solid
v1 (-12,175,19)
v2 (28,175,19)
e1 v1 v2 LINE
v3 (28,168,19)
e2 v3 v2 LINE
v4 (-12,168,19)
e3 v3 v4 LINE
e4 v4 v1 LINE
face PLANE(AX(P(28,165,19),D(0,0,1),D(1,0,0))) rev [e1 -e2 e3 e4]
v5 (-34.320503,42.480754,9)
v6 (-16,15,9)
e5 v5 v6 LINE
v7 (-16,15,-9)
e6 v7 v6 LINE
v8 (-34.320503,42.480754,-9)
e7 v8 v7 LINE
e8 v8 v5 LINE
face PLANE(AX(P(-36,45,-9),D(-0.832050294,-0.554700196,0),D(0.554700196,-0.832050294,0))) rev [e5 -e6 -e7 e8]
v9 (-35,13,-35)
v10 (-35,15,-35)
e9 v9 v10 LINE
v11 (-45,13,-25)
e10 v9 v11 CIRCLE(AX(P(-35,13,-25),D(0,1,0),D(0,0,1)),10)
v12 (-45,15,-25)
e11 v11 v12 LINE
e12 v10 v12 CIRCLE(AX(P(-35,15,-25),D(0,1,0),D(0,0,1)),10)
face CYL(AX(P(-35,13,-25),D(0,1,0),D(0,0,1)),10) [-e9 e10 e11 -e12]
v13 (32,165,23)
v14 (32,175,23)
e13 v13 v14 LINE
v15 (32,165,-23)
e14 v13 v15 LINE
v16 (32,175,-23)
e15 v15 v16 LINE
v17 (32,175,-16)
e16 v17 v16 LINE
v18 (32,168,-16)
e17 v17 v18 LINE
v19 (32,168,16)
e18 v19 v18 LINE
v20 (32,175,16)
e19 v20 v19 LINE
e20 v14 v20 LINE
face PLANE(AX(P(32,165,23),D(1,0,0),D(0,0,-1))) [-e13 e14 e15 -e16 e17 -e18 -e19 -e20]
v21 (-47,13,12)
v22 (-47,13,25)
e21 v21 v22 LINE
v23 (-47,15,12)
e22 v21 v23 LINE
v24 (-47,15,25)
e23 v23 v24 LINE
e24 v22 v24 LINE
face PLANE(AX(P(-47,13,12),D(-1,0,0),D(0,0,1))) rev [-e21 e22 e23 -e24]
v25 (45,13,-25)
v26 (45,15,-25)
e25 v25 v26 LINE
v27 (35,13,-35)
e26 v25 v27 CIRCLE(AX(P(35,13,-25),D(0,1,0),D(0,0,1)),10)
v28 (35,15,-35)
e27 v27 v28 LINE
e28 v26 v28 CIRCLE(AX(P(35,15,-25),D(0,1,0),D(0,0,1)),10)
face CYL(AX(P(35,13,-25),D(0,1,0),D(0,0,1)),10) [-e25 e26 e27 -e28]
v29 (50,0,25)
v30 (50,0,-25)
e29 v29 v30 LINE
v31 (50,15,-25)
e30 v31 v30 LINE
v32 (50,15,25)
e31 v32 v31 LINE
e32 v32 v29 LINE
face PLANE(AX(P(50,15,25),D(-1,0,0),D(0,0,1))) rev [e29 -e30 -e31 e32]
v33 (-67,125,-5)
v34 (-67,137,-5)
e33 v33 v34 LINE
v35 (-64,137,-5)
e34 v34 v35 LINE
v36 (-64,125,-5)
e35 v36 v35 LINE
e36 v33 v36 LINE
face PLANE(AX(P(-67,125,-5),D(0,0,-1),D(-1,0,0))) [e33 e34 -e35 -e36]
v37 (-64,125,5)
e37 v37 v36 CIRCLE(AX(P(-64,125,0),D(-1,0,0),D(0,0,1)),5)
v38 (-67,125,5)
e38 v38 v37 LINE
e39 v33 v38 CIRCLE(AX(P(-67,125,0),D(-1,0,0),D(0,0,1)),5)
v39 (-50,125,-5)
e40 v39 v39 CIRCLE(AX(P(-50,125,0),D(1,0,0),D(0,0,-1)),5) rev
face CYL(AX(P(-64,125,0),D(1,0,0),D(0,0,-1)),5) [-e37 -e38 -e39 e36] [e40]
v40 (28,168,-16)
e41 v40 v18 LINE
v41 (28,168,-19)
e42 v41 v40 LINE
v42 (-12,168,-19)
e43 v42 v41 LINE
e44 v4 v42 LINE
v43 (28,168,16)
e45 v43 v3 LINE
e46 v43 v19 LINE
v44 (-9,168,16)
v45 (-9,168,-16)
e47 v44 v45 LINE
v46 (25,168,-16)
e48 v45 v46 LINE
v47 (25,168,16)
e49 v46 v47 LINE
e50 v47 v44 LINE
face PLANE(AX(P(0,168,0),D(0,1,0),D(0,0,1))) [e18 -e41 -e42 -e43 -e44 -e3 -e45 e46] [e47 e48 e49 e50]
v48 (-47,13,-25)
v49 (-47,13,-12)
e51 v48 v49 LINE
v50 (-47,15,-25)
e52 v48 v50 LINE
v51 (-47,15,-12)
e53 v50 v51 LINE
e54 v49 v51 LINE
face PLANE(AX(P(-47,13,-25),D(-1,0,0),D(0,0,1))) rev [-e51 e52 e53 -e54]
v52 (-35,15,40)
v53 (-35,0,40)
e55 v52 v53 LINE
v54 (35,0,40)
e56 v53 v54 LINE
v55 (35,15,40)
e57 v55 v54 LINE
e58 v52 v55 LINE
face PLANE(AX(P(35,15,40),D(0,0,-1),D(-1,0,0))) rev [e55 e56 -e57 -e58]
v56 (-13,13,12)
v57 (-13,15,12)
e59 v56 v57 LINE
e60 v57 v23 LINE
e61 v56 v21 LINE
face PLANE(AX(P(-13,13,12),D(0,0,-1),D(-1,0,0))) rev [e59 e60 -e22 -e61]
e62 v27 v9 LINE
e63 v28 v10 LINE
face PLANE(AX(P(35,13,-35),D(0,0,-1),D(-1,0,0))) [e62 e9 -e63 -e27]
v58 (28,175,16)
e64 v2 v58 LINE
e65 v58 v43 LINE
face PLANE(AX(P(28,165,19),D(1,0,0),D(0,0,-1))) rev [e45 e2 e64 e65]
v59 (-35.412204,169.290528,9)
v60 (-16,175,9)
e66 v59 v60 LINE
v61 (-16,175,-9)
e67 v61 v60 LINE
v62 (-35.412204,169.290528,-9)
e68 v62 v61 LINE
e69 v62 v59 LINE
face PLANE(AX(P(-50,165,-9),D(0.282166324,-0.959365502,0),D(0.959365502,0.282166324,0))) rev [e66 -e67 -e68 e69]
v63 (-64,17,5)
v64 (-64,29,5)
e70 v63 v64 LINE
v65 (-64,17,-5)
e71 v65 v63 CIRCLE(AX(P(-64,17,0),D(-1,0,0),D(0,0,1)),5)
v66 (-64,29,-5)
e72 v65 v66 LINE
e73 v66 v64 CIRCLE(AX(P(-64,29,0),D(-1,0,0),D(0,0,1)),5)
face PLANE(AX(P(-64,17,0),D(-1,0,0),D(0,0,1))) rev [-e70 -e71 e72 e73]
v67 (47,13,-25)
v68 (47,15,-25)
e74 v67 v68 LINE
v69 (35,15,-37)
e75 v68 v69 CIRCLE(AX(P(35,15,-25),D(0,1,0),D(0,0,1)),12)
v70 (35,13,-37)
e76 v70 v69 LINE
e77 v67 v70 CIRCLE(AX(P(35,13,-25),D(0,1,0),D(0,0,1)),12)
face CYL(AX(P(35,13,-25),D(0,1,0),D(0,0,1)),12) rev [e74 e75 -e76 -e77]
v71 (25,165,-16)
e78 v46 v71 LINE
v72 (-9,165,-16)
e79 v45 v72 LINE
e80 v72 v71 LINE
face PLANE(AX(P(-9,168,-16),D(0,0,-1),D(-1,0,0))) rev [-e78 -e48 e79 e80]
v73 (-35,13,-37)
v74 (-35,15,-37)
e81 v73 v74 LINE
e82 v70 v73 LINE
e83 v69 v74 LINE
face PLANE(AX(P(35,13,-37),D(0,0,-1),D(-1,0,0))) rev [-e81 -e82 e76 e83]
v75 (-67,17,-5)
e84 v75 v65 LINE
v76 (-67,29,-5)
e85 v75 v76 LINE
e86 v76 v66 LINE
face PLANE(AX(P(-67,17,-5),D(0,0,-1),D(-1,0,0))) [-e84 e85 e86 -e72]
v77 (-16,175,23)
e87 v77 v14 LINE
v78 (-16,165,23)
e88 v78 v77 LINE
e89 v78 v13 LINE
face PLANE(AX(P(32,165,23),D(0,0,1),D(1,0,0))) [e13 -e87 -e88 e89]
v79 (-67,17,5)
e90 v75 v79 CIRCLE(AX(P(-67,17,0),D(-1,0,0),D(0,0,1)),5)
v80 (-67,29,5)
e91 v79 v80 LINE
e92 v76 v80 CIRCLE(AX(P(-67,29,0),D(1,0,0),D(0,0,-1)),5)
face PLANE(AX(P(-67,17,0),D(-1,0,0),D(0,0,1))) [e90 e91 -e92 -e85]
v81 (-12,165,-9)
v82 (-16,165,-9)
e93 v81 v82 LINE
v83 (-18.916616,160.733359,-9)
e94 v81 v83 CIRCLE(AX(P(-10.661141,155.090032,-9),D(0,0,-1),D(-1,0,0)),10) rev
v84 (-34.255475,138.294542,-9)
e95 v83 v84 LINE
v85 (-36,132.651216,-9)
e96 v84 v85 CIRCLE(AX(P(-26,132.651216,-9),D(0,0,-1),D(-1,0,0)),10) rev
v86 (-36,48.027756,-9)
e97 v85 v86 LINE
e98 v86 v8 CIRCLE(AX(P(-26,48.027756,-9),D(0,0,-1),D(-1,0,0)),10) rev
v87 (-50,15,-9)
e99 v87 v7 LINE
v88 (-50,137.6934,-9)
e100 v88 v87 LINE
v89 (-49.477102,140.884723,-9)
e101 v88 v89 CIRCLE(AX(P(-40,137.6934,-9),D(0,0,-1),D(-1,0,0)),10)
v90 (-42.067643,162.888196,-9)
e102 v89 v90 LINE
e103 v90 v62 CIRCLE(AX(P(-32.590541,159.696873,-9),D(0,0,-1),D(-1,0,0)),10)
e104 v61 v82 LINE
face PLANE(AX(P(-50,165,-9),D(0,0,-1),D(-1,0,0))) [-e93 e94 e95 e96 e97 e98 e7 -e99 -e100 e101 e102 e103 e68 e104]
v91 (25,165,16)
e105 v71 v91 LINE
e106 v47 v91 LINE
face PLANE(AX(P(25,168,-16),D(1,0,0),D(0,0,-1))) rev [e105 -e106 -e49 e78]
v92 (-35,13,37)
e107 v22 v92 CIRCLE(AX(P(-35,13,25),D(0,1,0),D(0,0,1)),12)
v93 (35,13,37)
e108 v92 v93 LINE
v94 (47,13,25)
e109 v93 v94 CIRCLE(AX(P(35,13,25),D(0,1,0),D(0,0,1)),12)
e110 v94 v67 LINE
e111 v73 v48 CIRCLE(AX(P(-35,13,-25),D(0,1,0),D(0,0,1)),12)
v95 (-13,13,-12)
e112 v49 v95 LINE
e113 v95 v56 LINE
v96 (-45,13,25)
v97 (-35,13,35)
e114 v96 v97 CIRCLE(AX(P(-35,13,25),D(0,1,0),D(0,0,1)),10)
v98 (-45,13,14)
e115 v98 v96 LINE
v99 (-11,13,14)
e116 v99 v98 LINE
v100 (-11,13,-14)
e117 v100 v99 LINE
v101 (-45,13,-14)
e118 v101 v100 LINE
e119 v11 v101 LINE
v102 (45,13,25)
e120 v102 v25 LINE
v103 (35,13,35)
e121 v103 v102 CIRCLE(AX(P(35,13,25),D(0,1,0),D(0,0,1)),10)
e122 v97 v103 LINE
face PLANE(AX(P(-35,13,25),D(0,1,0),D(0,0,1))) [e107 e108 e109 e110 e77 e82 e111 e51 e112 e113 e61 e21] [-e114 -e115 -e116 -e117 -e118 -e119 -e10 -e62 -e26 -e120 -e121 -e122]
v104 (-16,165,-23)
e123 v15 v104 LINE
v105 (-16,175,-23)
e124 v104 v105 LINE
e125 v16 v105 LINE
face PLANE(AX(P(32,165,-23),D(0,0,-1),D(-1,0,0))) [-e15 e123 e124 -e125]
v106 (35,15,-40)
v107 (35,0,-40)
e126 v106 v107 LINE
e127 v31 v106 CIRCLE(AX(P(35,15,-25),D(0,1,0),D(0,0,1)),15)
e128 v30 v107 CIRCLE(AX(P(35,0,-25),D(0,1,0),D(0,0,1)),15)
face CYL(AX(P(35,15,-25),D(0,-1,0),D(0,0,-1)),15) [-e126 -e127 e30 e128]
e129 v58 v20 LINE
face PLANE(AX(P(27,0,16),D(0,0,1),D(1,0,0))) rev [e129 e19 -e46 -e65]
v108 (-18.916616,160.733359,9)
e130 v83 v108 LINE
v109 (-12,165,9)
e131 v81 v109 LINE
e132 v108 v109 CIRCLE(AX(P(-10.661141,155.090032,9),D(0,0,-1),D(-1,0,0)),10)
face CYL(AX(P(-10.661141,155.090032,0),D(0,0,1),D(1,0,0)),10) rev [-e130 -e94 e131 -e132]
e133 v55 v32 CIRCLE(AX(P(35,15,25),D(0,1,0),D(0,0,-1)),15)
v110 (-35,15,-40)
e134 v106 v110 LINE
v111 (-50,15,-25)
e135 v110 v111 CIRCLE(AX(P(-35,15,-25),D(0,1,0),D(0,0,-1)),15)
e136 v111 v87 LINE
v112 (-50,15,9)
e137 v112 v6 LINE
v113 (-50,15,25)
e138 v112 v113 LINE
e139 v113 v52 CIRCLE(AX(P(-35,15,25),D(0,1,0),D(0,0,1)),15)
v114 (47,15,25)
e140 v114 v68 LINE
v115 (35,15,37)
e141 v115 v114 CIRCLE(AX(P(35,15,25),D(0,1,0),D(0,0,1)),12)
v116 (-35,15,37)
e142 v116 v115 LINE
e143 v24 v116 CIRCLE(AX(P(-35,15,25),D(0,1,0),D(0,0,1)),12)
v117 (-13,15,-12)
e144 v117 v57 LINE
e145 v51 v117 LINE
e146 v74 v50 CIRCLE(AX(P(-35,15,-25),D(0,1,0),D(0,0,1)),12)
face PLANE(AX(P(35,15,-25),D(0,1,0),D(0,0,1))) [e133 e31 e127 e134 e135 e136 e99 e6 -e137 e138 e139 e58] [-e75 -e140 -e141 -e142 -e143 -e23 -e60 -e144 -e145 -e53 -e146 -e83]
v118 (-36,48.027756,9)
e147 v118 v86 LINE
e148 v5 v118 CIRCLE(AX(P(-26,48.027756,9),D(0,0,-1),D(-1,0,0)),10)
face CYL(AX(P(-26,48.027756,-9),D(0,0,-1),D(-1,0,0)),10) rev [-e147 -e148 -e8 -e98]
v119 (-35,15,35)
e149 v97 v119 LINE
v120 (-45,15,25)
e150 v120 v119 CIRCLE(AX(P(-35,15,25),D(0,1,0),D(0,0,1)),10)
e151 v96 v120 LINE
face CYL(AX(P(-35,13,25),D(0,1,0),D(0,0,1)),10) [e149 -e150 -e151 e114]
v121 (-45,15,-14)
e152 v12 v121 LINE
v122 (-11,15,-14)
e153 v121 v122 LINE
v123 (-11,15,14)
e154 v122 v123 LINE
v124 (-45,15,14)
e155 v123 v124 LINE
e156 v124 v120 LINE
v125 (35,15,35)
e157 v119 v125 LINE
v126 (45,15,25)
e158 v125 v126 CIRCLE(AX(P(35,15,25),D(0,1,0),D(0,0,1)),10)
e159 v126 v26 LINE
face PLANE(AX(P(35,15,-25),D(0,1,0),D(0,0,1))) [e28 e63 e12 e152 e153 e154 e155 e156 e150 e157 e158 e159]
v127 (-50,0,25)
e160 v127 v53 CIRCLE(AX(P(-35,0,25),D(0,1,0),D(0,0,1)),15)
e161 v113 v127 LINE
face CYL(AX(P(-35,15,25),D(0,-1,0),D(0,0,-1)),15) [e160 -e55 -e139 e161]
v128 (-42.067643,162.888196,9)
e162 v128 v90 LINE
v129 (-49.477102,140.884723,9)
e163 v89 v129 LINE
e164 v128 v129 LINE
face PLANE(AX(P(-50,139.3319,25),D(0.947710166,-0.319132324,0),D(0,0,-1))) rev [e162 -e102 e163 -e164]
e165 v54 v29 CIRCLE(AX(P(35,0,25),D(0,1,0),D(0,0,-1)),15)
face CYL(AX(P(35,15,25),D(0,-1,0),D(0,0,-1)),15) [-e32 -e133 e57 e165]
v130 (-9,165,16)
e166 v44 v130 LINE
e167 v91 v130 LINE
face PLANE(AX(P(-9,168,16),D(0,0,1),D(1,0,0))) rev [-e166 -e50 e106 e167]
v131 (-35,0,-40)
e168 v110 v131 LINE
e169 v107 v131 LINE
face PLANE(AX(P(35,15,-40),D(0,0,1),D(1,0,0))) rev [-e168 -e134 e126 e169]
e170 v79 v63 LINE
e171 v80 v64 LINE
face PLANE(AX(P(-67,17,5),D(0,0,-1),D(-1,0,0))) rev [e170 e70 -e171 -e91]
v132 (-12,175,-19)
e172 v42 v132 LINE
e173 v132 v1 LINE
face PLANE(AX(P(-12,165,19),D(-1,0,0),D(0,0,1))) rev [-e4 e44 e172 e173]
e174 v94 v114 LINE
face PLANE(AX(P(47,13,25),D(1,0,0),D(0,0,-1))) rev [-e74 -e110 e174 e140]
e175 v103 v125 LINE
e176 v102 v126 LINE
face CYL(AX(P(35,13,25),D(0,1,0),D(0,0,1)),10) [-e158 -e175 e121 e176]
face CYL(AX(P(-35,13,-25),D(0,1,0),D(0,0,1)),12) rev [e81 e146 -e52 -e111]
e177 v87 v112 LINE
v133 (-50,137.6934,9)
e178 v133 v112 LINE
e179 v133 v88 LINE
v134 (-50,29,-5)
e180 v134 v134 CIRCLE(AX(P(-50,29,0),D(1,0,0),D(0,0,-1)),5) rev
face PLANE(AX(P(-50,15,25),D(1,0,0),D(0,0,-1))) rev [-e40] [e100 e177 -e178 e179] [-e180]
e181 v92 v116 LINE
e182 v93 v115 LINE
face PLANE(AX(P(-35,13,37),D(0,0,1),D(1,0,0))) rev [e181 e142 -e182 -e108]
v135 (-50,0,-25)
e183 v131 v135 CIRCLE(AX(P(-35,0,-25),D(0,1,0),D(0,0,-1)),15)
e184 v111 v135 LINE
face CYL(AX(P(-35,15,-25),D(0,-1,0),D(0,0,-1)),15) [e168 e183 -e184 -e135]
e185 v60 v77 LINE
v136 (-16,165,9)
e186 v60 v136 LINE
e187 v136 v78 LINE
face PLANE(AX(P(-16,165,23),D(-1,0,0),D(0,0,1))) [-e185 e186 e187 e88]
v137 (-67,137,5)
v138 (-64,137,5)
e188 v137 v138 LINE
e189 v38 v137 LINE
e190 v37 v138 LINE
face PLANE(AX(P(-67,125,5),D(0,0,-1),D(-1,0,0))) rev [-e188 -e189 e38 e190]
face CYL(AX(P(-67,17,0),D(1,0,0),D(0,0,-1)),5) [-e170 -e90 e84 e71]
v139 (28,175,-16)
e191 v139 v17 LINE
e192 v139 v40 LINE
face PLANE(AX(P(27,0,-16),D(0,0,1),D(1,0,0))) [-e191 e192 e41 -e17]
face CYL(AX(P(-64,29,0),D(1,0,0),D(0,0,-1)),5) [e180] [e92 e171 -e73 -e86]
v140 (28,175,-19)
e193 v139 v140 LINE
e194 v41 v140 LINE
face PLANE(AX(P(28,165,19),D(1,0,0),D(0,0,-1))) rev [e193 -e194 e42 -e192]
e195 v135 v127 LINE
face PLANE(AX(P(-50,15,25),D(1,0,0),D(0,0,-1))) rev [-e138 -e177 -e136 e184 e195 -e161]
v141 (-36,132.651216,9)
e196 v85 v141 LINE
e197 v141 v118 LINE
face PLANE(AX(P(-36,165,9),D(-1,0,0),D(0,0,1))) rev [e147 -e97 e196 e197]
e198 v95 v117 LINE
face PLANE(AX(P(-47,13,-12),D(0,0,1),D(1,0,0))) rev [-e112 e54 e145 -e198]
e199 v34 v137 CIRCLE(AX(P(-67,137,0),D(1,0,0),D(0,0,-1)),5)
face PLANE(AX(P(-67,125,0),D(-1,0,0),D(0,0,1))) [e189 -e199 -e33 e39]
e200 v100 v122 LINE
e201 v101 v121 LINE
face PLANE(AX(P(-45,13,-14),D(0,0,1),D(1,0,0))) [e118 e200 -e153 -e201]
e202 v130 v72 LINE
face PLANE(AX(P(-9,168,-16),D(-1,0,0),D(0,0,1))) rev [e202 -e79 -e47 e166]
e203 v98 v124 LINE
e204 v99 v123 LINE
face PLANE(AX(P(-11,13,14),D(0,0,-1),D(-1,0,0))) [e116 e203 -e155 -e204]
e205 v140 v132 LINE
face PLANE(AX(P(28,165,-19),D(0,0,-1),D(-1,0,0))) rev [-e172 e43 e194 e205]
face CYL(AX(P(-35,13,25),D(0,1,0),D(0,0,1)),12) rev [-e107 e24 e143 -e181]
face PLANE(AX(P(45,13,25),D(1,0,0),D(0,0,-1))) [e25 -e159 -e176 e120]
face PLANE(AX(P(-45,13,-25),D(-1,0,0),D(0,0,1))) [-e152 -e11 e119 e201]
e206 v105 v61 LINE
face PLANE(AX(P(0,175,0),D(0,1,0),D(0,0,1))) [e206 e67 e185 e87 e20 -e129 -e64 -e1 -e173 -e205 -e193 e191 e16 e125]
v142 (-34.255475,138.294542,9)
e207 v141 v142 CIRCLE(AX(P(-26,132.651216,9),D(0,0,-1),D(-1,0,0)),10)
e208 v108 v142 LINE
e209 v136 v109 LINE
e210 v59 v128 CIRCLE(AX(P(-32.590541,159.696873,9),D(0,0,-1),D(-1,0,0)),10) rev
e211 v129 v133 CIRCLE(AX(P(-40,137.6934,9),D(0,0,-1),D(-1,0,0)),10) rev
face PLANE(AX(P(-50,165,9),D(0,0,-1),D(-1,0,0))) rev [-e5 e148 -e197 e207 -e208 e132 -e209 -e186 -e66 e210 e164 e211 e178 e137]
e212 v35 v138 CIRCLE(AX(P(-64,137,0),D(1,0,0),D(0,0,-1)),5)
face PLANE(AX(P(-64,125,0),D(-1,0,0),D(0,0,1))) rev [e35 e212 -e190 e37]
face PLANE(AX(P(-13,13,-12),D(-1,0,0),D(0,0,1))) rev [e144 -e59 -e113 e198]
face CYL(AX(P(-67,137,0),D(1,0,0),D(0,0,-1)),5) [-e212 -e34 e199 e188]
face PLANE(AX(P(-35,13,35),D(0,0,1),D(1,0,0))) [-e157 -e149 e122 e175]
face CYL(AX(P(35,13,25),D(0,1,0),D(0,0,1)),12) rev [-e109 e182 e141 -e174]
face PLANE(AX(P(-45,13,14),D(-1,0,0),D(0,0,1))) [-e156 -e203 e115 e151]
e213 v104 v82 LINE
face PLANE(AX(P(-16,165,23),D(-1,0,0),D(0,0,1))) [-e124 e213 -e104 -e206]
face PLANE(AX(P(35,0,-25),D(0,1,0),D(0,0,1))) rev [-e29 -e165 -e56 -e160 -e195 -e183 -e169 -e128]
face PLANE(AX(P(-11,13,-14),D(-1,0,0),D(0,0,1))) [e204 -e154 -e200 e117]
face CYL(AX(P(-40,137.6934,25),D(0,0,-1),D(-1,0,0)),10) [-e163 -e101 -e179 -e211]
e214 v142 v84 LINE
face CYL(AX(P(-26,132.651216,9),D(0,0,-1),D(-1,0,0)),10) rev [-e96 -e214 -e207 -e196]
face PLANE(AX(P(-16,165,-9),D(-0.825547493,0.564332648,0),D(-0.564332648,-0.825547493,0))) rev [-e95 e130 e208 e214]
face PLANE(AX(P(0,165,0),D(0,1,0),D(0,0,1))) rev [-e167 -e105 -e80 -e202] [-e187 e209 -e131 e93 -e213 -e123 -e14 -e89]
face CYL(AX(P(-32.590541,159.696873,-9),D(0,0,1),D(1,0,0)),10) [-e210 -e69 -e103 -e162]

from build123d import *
from build123d.topology import SkipClean

# Parameters (mm, degrees)
BOSS_EXTRUDE1_DEPTH  = 15
SKETCH3_W            = 14
SKETCH3_H            = 18
BOSS_EXTRUDE2_DEPTH  = 150
BOSS_EXTRUDE3_DEPTH  = 18
SKETCH7_W            = 48
SKETCH7_H            = 46
SKETCH7_W_2          = 40
SKETCH7_H_2          = 38
BOSS_EXTRUDE4_DEPTH  = 10
BOSS_EXTRUDE5_DEPTH  = 18
FILLET2_R            = 10
CHAMFER2_SIZE        = 10
CHAMFER2_SIZE2       = 25.668100083
FILLET3_R            = 10
FILLET4_R            = 10
SKETCH11_W           = 40
SKETCH11_H           = 38
SKETCH11_W_2         = 34
SKETCH11_H_2         = 32
BOSS_EXTRUDE6_DEPTH  = 3
SKETCH12_W           = 32
SKETCH12_H           = 7
CUT_EXTRUDE2_DEPTH   = 5
CUT_EXTRUDE3_DEPTH   = 2
SKETCH15_R           = 5
BOSS_EXTRUDE8_DEPTH  = 14
BOSS_EXTRUDE10_DEPTH = 3


with BuildPart() as part:
    # Sketch1 → Boss-Extrude1 (new body)
    with BuildSketch(Plane(origin=(0, 0, 0), x_dir=(1, 0, 0), z_dir=(0, 1, 0))):
        with BuildLine():
            Line((35, -40), (-35, -40))
            ThreePointArc((-35, -40), (-45.606601718, -35.606601718), (-50, -25))
            Line((-50, -25), (-50, 25))
            ThreePointArc((-50, 25), (-45.606601718, 35.606601718), (-35, 40))
            Line((-35, 40), (35, 40))
            ThreePointArc((35, 40), (45.606601718, 35.606601718), (50, 25))
            Line((50, 25), (50, -25))
            ThreePointArc((50, -25), (45.606601718, -35.606601718), (35, -40))
        make_face()
    extrude(amount=BOSS_EXTRUDE1_DEPTH)

    # Sketch3 → Boss-Extrude2 (add)
    with BuildSketch(Plane(origin=(0, 15, 0), x_dir=(1, 0, 0), z_dir=(0, 1, 0))):
        with Locations((-43, 0)):
            Rectangle(SKETCH3_W, SKETCH3_H)
    extrude(amount=BOSS_EXTRUDE2_DEPTH)

    # Sketch5 → Boss-Extrude3 (add)
    with BuildSketch(Plane.XY.offset(9)):
        Polygon((-36, 15), (-36, 45), (-16, 15), align=None)
    extrude(amount=-BOSS_EXTRUDE3_DEPTH)



with BuildPart() as body_2:
    # Sketch7 → Boss-Extrude4 (new body)
    with BuildSketch(Plane(origin=(0, 175, 0), x_dir=(1, 0, 0), z_dir=(0, 1, 0))):
        with Locations((8, 0)):
            Rectangle(SKETCH7_W, SKETCH7_H)
        with Locations((8, 0)):
            Rectangle(SKETCH7_W_2, SKETCH7_H_2, mode=Mode.SUBTRACT)
    extrude(amount=-BOSS_EXTRUDE4_DEPTH)


with BuildPart() as part_1:
    add(part.part)

    add(body_2.part)  # Boss-Extrude5 merges body 2
    # Sketch8 → Boss-Extrude5 (add)
    with BuildSketch(Plane.XY.offset(9)):
        Polygon((-50, 165), (-16, 175), (-16, 165), (-36, 135.742522323), (-36, 165), align=None)
    extrude(amount=-BOSS_EXTRUDE5_DEPTH)

    # Fillet2
    # the kernel refuses this fillet: 10 mm, written as the material it adds along each edge
    with BuildSketch(Plane(origin=(-16, 165, 9), x_dir=(1, 0, 0), z_dir=(0, 0, -1))) as fillet2_piece_1:
        with BuildLine():
            CenterArc((5.338859158, 9.909967515), FILLET2_R, 214.35596202, 47.949835241)
            Line((-2.916615768, 4.266641036), (0, 0))
            Line((0, 0), (4, 0))
        make_face()
    extrude(amount=18)
    with BuildSketch(Plane(origin=(-36, 135.742522323, 9), x_dir=(0.5643326479831027, 0.825547492528673, 0), z_dir=(0, 0, -1))) as fillet2_piece_2:
        with BuildLine():
            CenterArc((FILLET2_R * 0.309130630834, FILLET2_R), FILLET2_R, 235.64403798, 34.35596202)
            Line((-FILLET2_R * 0.255202017149, FILLET2_R * 0.174452507471), (0, 0))
            Line((0, 0), (FILLET2_R * 0.309130630834, 0))
        make_face()
    extrude(amount=18)

    # Chamfer2
    chamfer2_edges = [part_1.edges().sort_by_distance(p)[0] for p in [
        (-50, 165, 0),
    ]]
    chamfer2_side = [part_1.faces().sort_by_distance(p)[0] for p in [
        (-33, 170, 0),
    ]]
    chamfer(chamfer2_edges, length=CHAMFER2_SIZE, length2=CHAMFER2_SIZE2, reference=chamfer2_side[0])

    # Fillet3
    fillet3_edges = [part_1.edges().sort_by_distance(p)[0] for p in [
        (-50, 139.331899917, 0),
        (-40.406344984, 167.82166324, 0),
    ]]
    fillet(fillet3_edges, radius=FILLET3_R)

    # Fillet4
    fillet4_edges = [part_1.edges().sort_by_distance(p)[0] for p in [
        (-36, 45, 0),
    ]]
    fillet(fillet4_edges, radius=FILLET4_R)

    # Sketch11 → Boss-Extrude6 (add)
    with BuildSketch(Plane.XZ.offset(-165)):
        with Locations((8, 0)):
            Rectangle(SKETCH11_W, SKETCH11_H)
        with Locations((8, 0)):
            Rectangle(SKETCH11_W_2, SKETCH11_H_2, mode=Mode.SUBTRACT)
    extrude(amount=-BOSS_EXTRUDE6_DEPTH)

    # Sketch12 → Cut-Extrude2 (cut)
    with BuildSketch(Plane(origin=(32, 0, 0), x_dir=(0, 0, -1), z_dir=(1, 0, 0))):
        with Locations((0, 171.5)):
            Rectangle(SKETCH12_W, SKETCH12_H)
    extrude(amount=-CUT_EXTRUDE2_DEPTH, mode=Mode.SUBTRACT)

    # Sketch13 → Cut-Extrude3 (cut)
    with BuildSketch(Plane(origin=(0, 15, 0), x_dir=(1, 0, 0), z_dir=(0, 1, 0))):
        with BuildLine():
            Line((-47, 12), (-13, 12))
            Line((-13, 12), (-13, -12))
            Line((-13, -12), (-47, -12))
            Line((-47, -12), (-47, -25))
            ThreePointArc((-47, -25), (-43.485281374, -33.485281374), (-35, -37))
            Line((-35, -37), (35, -37))
            ThreePointArc((35, -37), (43.485281374, -33.485281374), (47, -25))
            Line((47, -25), (47, 25))
            ThreePointArc((47, 25), (43.485281374, 33.485281374), (35, 37))
            Line((35, 37), (-35, 37))
            ThreePointArc((-35, 37), (-43.485281374, 33.485281374), (-47, 25))
            Line((-47, 25), (-47, 12))
        make_face()
        with BuildLine():
            Line((-45, 14), (-11, 14))
            Line((-11, 14), (-11, -14))
            Line((-11, -14), (-45, -14))
            Line((-45, -14), (-45, -25))
            ThreePointArc((-45, -25), (-42.071067812, -32.071067812), (-35, -35))
            Line((-35, -35), (35, -35))
            ThreePointArc((35, -35), (42.071067812, -32.071067812), (45, -25))
            Line((45, -25), (45, 25))
            ThreePointArc((45, 25), (42.071067812, 32.071067812), (35, 35))
            Line((35, 35), (-35, 35))
            ThreePointArc((-35, 35), (-42.071067812, 32.071067812), (-45, 25))
            Line((-45, 25), (-45, 14))
        make_face(mode=Mode.SUBTRACT)
    extrude(amount=-CUT_EXTRUDE3_DEPTH, mode=Mode.SUBTRACT)

    # Sketch15 → Boss-Extrude8 (add)
    with BuildSketch(Plane.ZY.offset(50)):
        with Locations(Location((0, 125, 0), (0, 0, 180))):
            Circle(SKETCH15_R)
        with Locations(Location((0, 29, 0), (0, 0, 180))):
            Circle(SKETCH15_R)
    extrude(amount=BOSS_EXTRUDE8_DEPTH)

    # Sketch16 → Boss-Extrude10 (add)
    with SkipClean():  # the faces are left unmerged after this step: merging them gives an invalid solid
        with BuildSketch(Plane.ZY.offset(64)):
            with BuildLine():
                Line((-5, 125), (-5, 137))
                ThreePointArc((-5, 137), (0, 142), (5, 137))
                Line((5, 137), (5, 125))
                ThreePointArc((5, 125), (0, 120), (-5, 125))
            make_face()
            with BuildLine():
                Line((-5, 17), (-5, 29))
                ThreePointArc((-5, 29), (0, 34), (5, 29))
                Line((5, 29), (5, 17))
                ThreePointArc((5, 17), (0, 12), (-5, 17))
            make_face()
        extrude(amount=BOSS_EXTRUDE10_DEPTH)
    add(part_1.part.scale(1), mode=Mode.REPLACE)  # the faces are merged on a copy


solid = part_1.part
